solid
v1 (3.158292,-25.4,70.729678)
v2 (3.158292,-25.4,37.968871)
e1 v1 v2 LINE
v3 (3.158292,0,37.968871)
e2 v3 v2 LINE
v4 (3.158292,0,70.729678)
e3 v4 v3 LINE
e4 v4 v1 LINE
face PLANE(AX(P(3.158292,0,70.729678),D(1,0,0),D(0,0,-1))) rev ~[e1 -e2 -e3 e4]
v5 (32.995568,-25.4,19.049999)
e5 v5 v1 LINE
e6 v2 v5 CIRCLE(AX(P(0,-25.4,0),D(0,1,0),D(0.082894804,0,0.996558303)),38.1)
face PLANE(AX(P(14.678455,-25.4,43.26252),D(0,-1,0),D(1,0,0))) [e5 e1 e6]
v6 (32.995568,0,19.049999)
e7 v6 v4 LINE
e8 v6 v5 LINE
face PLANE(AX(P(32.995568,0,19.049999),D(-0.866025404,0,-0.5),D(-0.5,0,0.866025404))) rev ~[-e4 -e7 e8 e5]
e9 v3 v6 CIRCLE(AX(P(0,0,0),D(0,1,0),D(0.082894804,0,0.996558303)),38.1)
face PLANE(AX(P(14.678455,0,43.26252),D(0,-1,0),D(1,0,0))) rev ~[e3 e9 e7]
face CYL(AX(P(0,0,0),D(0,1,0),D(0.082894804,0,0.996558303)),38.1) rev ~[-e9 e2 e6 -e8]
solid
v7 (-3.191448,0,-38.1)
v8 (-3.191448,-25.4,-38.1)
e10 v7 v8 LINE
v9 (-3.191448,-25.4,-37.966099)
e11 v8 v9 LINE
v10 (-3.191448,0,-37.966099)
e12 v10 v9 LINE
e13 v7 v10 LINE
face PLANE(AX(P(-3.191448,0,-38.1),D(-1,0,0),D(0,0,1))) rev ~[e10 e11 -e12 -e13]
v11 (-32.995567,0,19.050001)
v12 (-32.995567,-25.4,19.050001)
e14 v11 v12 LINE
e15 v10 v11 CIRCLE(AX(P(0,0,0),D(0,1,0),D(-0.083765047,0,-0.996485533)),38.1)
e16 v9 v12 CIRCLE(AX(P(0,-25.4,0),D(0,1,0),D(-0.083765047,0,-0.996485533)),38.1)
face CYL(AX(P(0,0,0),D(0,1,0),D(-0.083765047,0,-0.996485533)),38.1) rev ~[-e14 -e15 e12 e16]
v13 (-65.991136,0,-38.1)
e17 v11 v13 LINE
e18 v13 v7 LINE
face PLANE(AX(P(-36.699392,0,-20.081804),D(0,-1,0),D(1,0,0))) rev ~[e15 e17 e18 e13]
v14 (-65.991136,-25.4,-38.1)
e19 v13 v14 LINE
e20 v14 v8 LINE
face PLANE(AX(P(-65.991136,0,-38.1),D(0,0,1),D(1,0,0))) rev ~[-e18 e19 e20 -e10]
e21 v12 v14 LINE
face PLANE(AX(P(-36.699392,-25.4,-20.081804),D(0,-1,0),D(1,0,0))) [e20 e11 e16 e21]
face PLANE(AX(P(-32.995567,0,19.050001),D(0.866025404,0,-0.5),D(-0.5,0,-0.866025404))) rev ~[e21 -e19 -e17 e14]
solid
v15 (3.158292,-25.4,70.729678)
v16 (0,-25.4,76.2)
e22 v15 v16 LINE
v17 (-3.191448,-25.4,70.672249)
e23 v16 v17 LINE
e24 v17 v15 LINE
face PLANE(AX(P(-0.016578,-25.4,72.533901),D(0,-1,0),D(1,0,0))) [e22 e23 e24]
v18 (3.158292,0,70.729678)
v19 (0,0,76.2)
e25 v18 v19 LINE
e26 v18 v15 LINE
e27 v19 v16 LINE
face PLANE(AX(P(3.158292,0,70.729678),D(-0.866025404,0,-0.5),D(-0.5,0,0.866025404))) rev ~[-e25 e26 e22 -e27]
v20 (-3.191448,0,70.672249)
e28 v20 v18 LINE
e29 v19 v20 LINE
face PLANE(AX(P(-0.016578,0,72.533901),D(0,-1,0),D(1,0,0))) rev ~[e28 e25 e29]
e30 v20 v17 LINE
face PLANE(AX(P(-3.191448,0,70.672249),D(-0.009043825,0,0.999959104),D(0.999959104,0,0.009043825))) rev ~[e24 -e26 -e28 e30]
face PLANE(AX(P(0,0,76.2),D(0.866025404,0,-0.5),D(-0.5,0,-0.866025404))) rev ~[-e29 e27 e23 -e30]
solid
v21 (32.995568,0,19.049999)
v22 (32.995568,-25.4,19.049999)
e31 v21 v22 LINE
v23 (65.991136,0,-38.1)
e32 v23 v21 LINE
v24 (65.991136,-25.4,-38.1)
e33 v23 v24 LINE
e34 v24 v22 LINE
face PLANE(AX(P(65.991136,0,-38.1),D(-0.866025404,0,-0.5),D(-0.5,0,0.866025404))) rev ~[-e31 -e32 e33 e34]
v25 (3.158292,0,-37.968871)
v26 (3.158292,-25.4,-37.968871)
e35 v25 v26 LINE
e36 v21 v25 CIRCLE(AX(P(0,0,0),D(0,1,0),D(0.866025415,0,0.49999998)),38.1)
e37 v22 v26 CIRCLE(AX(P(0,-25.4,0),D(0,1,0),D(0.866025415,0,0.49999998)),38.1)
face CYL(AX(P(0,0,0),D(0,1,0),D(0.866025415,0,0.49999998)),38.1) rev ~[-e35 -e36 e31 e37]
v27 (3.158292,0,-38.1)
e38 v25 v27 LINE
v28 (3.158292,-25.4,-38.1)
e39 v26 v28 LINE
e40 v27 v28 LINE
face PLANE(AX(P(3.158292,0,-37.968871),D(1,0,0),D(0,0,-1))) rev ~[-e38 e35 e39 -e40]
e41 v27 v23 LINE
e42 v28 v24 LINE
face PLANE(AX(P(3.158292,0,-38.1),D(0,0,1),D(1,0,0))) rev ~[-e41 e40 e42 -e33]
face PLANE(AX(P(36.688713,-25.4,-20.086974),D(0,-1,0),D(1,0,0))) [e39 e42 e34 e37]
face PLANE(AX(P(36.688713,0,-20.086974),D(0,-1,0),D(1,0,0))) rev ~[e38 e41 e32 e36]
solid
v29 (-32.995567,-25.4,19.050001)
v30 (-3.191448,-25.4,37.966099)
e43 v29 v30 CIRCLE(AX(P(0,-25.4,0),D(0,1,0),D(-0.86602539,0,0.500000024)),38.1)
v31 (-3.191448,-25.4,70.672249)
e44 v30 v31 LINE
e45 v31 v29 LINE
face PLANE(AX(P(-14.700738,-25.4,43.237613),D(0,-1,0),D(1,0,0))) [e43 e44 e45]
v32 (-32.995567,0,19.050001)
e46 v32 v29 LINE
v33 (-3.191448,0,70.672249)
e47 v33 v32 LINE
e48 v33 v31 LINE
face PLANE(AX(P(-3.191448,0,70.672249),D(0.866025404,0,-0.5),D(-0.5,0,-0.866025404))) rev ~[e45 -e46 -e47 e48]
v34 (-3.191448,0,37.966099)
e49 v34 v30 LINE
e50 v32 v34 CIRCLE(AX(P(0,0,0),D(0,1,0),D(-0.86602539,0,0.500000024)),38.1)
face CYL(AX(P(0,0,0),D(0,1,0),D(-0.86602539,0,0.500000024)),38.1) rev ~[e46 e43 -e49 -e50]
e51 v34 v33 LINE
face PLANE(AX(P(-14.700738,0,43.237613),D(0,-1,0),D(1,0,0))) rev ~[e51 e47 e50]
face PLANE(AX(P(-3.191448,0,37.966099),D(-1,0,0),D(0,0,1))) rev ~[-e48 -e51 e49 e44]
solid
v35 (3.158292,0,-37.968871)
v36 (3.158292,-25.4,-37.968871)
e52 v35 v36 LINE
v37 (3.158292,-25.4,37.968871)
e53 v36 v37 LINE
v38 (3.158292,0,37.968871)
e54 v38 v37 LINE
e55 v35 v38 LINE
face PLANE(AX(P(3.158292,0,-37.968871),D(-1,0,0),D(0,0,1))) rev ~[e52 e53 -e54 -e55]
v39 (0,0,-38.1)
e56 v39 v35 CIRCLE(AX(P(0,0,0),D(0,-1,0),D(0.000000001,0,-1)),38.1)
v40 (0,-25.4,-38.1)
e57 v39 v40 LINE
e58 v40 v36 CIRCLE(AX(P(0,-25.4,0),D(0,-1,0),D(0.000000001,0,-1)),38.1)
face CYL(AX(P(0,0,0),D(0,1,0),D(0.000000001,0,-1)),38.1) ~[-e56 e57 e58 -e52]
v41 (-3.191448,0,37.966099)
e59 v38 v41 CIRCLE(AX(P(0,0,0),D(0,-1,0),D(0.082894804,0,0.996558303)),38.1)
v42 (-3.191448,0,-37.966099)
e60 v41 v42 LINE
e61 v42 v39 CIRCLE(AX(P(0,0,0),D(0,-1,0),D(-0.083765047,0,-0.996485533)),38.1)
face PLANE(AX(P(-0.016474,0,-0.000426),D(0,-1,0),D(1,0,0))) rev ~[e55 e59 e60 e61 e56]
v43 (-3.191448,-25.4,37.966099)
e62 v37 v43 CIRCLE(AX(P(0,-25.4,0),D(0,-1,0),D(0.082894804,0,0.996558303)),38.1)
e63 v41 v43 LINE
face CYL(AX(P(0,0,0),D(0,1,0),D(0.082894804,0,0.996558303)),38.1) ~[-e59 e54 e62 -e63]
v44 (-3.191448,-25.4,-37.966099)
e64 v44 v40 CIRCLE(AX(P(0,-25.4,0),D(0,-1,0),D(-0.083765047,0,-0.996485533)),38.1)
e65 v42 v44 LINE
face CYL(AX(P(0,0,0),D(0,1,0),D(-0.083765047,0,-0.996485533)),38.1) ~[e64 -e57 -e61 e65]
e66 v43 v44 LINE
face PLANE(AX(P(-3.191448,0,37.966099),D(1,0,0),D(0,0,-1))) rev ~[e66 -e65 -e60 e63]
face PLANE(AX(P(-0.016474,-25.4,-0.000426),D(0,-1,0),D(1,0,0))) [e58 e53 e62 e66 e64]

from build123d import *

# Parameters (mm, degrees)
F1_DEPTH = 25.4


with BuildPart() as f1:
    # F0 (on Front) → F1 (new body)
    with BuildSketch(Plane.XZ):
        Polygon((-3.1914482743, 70.6722494391), (3.1582920346, 70.7296777309), (0, 76.2), align=None)
    extrude(amount=F1_DEPTH)


with BuildPart() as f1b:
    # F0 (on Front) → F1, piece 2 (new body)
    with BuildSketch(Plane.XZ):
        with BuildLine():
            ThreePointArc((-32.9955673517, 19.0500009224), (-20.4164079771, 32.168000953), (-3.1914482743, 37.9660987976))
            Line((-3.1914482743, 37.9660987976), (-3.1914482743, 70.6722494391))
            Line((-3.1914482743, 70.6722494391), (-32.9955673517, 19.0500009224))
        make_face()
    extrude(amount=F1_DEPTH)


with BuildPart() as f1c:
    # F0 (on Front) → F1, piece 3 (new body)
    with BuildSketch(Plane.XZ):
        with BuildLine():
            ThreePointArc((3.1582920346, 37.9688713478), (20.4023610122, 32.1769119887), (32.995568315, 19.0499992538))
            Line((32.995568315, 19.0499992538), (3.1582920346, 70.7296777309))
            Line((3.1582920346, 70.7296777309), (3.1582920346, 37.9688713478))
        make_face()
    extrude(amount=F1_DEPTH)


with BuildPart() as f1d:
    # F0 (on Front) → F1, piece 4 (new body)
    with BuildSketch(Plane.XZ):
        with BuildLine():
            ThreePointArc((4.21e-08, -38.1), (1.58050653, -38.0672037206), (3.1582920346, -37.9688713478))
            Line((3.1582920346, -37.9688713478), (3.1582920346, 37.9688713478))
            ThreePointArc((3.1582920346, 37.9688713478), (-0.0166359796, 38.099996368), (-3.1914482743, 37.9660987976))
            Line((-3.1914482743, 37.9660987976), (-3.1914482743, -37.9660987976))
            ThreePointArc((-3.1914482743, -37.9660987976), (-1.5971279966, -38.0665099814), (4.21e-08, -38.1))
        make_face()
    extrude(amount=F1_DEPTH)


with BuildPart() as f1e:
    # F0 (on Front) → F1, piece 5 (new body)
    with BuildSketch(Plane.XZ):
        with BuildLine():
            Line((-3.1914482743, -38.1), (-3.1914482743, -37.9660987976))
            ThreePointArc((-3.1914482743, -37.9660987976), (-33.7651289321, -17.6501010819), (-32.9955673517, 19.0500009224))
            Line((-32.9955673517, 19.0500009224), (-65.9911357684, -38.1))
            Line((-65.9911357684, -38.1), (-3.1914482743, -38.1))
        make_face()
    extrude(amount=F1_DEPTH)


with BuildPart() as f1f:
    # F0 (on Front) → F1, piece 6 (new body)
    with BuildSketch(Plane.XZ):
        with BuildLine():
            ThreePointArc((32.995568315, 19.0499992538), (36.8017740931, 9.8610052023), (38.1, 0))
            ThreePointArc((38.1, 0), (28.0351647625, -25.7999910221), (3.1582920346, -37.9688713478))
            Line((3.1582920346, -37.9688713478), (3.1582920346, -38.1))
            Line((3.1582920346, -38.1), (65.9911357684, -38.1))
            Line((65.9911357684, -38.1), (32.995568315, 19.0499992538))
        make_face()
    extrude(amount=F1_DEPTH)


solid = Compound([f1.part, f1b.part, f1c.part, f1d.part, f1e.part, f1f.part])
